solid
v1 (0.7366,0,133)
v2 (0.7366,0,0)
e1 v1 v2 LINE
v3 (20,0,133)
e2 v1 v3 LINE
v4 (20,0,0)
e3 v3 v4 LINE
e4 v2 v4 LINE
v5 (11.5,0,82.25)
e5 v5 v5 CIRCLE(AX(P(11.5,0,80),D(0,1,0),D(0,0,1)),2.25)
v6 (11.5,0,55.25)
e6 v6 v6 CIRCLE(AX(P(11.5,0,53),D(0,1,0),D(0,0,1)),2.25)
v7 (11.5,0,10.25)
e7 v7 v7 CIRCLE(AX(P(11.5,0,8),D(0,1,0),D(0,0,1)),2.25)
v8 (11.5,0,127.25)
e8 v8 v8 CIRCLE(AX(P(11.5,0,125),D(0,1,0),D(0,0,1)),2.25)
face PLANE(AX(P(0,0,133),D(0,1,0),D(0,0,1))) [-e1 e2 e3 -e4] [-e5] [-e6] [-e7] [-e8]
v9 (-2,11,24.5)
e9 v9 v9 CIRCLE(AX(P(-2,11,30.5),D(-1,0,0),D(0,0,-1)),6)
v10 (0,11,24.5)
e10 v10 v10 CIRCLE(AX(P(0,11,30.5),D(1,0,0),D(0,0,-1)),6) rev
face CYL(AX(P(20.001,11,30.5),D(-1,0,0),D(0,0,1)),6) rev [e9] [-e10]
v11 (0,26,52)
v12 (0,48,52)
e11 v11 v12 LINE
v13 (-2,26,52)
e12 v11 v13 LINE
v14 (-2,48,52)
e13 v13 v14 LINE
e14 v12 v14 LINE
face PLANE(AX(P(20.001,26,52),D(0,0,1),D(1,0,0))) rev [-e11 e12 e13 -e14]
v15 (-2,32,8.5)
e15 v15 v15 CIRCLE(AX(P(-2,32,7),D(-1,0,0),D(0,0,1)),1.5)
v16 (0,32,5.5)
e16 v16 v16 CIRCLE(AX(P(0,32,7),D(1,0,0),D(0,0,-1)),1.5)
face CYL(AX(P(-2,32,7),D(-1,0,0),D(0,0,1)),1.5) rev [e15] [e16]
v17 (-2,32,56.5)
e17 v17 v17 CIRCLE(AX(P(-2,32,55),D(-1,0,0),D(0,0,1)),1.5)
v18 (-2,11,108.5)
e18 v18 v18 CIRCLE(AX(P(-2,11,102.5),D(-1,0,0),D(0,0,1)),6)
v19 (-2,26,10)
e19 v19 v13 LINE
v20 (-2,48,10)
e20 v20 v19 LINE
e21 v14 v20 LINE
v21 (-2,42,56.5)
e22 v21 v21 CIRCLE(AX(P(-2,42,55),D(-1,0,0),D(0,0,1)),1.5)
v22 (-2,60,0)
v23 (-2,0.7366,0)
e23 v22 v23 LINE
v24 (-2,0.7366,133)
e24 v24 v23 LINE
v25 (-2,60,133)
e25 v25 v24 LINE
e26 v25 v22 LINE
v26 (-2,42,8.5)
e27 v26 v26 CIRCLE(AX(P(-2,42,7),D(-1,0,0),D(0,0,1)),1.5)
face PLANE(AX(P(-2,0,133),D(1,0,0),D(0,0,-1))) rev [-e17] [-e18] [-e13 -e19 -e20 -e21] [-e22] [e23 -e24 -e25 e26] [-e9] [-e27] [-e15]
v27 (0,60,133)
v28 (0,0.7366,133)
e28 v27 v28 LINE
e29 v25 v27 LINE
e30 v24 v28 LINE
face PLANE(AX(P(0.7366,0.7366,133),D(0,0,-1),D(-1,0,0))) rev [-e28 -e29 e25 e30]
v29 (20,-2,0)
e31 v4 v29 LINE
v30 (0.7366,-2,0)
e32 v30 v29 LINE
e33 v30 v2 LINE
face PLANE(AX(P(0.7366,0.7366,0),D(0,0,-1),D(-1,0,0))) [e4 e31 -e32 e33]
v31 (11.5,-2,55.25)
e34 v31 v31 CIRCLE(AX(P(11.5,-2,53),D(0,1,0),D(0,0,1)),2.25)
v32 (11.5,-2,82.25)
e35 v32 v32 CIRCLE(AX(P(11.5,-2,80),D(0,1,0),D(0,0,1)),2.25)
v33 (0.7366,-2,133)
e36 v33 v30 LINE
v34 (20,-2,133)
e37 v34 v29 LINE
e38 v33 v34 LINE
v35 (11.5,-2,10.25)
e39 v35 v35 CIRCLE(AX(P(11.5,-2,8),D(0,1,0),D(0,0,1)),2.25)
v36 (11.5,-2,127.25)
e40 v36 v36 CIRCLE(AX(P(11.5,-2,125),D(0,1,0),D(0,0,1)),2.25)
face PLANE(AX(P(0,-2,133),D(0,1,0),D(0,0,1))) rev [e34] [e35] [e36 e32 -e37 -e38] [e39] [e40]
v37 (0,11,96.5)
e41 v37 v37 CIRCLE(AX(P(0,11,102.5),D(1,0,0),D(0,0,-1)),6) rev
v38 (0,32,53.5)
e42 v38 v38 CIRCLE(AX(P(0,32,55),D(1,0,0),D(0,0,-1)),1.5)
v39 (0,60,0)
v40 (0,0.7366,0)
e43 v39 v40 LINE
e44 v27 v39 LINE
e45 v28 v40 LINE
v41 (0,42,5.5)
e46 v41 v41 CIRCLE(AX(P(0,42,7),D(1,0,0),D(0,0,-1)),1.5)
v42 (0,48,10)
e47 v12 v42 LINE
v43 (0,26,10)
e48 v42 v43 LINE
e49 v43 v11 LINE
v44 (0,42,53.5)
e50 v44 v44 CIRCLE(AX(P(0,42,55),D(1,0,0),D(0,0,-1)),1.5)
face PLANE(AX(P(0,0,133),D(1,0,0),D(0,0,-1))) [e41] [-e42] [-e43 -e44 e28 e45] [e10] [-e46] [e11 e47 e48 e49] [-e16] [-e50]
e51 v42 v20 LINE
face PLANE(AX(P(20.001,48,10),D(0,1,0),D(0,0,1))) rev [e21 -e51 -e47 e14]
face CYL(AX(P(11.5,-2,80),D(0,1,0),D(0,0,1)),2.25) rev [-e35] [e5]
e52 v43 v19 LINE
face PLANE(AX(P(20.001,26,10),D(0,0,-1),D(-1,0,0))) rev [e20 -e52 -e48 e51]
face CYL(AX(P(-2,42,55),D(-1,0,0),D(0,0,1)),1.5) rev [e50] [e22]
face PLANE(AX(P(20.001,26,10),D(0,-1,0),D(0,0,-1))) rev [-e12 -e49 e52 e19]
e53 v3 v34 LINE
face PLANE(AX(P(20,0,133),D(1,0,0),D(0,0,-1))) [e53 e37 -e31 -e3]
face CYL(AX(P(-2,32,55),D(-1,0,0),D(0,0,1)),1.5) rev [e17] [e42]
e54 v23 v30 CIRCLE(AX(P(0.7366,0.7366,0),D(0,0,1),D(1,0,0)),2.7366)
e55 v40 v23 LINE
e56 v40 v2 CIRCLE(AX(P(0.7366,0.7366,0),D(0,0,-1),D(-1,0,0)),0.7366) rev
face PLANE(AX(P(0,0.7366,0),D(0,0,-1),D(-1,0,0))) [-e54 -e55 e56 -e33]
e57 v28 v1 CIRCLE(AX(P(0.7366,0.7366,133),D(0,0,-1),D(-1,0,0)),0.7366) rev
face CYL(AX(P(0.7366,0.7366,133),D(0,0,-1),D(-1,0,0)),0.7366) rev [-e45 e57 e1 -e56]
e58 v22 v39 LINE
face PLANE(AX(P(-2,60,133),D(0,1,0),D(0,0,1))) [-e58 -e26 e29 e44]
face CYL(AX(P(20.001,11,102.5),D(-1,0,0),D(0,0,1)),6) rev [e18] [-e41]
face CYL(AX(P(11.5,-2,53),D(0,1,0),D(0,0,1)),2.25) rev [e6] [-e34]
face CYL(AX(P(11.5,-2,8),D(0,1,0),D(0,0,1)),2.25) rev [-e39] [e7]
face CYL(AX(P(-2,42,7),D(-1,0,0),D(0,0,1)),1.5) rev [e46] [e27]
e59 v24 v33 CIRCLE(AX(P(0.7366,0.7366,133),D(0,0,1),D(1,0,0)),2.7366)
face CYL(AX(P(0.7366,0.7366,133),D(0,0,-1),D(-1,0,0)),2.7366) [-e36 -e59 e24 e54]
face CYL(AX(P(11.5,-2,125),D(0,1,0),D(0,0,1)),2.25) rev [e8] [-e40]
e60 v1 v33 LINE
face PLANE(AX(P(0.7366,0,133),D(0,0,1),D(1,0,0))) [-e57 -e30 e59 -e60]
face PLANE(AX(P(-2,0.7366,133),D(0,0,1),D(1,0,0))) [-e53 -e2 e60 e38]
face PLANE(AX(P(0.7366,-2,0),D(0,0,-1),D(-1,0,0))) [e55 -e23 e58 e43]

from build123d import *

# Parameters (mm, degrees)
SM_BASE_FLANGE_1_DEPTH = 133
CUT_EXTRUDE_1_REACH    = 149.557
SKETCH_2_R             = 6
SKETCH_2_W             = 42
SKETCH_2_H             = 22
M4X0_7_3_D             = 2.5
M4X0_7_3_DEPTH         = 7.5
M4X0_7_3_CBORE_D       = 3
M4X0_7_3_CBORE_DEPTH   = 6
M4X0_7_3_TIP           = 0.751075774
SKETCH_6_R             = 2.25
CUT_EXTRUDE_2_DEPTH    = 148.271857461


# Sheet-metal steps are written as plain solids
with BuildPart() as part:
    # Sketch 1 → 基材-凸緣1 (new body)
    with BuildSketch(Plane.XY):
        with BuildLine():
            Line((0, 60), (0, 0.7366))
            ThreePointArc((0, 0.7366), (0.215745145, 0.215745145), (0.7366, 0))
            Line((0.7366, 0), (20, 0))
            Line((20, 0), (20, -2))
            Line((20, -2), (0.7366, -2))
            ThreePointArc((0.7366, -2), (-1.198468417, -1.198468417), (-2, 0.7366))
            Line((-2, 0.7366), (-2, 60))
            Line((-2, 60), (0, 60))
        make_face()
    extrude(amount=SM_BASE_FLANGE_1_DEPTH)

    # Sketch 2 → 除料-伸長1 (cut, up to next)
    with BuildSketch(Plane.ZY.offset(2), mode=Mode.PRIVATE) as cut_extrude_1_sk1:
        with Locations((102.5, 11)):
            Circle(SKETCH_2_R)
    cut_extrude_1_tool1 = extrude(cut_extrude_1_sk1.sketch, amount=-CUT_EXTRUDE_1_REACH, mode=Mode.PRIVATE) & part.part
    # Sketch 2 → 除料-伸長1 (cut, up to next)
    with BuildSketch(Plane.ZY.offset(2), mode=Mode.PRIVATE) as cut_extrude_1_sk2:
        with Locations(Location((30.5, 11, 0), (0, 0, 180))):
            Circle(SKETCH_2_R)
    cut_extrude_1_tool2 = extrude(cut_extrude_1_sk2.sketch, amount=-CUT_EXTRUDE_1_REACH, mode=Mode.PRIVATE) & part.part
    # Sketch 2 → 除料-伸長1 (cut, up to next)
    with BuildSketch(Plane.ZY.offset(2), mode=Mode.PRIVATE) as cut_extrude_1_sk3:
        with Locations((31, 37)):
            Rectangle(SKETCH_2_W, SKETCH_2_H)
    cut_extrude_1_tool3 = extrude(cut_extrude_1_sk3.sketch, amount=-CUT_EXTRUDE_1_REACH, mode=Mode.PRIVATE) & part.part
    add(cut_extrude_1_tool1.solids().sort_by_distance((-2, 11, 102.5))[0], mode=Mode.SUBTRACT)
    add(cut_extrude_1_tool2.solids().sort_by_distance((-2, 11, 30.5))[0], mode=Mode.SUBTRACT)
    add(cut_extrude_1_tool3.solids().sort_by_distance((-2, 37, 31))[0], mode=Mode.SUBTRACT)

    # M4x0.7 螺紋孔3
    with Locations(Plane.ZY.offset(2)):
        with Locations((55, 42), (55, 32), (7, 42), (7, 32)):
            CounterBoreHole(M4X0_7_3_D / 2, M4X0_7_3_CBORE_D / 2, M4X0_7_3_CBORE_DEPTH, depth=M4X0_7_3_DEPTH)
            with Locations((0, 0, -(M4X0_7_3_DEPTH + M4X0_7_3_TIP / 2))):  # 118° drill point
                Cone(0, M4X0_7_3_D / 2, M4X0_7_3_TIP, mode=Mode.SUBTRACT)

    # 草圖6 → 除料-伸長2 (cut, through all)
    with BuildSketch(Plane(origin=(0, 0, 0), x_dir=(1, 0, 0), z_dir=(0, 1, 0))):
        with Locations(Location((11.5, -125, 0), (0, 0, 270))):
            Circle(SKETCH_6_R)
        with Locations(Location((11.5, -80, 0), (0, 0, 270))):
            Circle(SKETCH_6_R)
        with Locations(Location((11.5, -8, 0), (0, 0, 270))):
            Circle(SKETCH_6_R)
        with Locations(Location((11.5, -53, 0), (0, 0, 270))):
            Circle(SKETCH_6_R)
    extrude(amount=-CUT_EXTRUDE_2_DEPTH, mode=Mode.SUBTRACT)


solid = part.part
